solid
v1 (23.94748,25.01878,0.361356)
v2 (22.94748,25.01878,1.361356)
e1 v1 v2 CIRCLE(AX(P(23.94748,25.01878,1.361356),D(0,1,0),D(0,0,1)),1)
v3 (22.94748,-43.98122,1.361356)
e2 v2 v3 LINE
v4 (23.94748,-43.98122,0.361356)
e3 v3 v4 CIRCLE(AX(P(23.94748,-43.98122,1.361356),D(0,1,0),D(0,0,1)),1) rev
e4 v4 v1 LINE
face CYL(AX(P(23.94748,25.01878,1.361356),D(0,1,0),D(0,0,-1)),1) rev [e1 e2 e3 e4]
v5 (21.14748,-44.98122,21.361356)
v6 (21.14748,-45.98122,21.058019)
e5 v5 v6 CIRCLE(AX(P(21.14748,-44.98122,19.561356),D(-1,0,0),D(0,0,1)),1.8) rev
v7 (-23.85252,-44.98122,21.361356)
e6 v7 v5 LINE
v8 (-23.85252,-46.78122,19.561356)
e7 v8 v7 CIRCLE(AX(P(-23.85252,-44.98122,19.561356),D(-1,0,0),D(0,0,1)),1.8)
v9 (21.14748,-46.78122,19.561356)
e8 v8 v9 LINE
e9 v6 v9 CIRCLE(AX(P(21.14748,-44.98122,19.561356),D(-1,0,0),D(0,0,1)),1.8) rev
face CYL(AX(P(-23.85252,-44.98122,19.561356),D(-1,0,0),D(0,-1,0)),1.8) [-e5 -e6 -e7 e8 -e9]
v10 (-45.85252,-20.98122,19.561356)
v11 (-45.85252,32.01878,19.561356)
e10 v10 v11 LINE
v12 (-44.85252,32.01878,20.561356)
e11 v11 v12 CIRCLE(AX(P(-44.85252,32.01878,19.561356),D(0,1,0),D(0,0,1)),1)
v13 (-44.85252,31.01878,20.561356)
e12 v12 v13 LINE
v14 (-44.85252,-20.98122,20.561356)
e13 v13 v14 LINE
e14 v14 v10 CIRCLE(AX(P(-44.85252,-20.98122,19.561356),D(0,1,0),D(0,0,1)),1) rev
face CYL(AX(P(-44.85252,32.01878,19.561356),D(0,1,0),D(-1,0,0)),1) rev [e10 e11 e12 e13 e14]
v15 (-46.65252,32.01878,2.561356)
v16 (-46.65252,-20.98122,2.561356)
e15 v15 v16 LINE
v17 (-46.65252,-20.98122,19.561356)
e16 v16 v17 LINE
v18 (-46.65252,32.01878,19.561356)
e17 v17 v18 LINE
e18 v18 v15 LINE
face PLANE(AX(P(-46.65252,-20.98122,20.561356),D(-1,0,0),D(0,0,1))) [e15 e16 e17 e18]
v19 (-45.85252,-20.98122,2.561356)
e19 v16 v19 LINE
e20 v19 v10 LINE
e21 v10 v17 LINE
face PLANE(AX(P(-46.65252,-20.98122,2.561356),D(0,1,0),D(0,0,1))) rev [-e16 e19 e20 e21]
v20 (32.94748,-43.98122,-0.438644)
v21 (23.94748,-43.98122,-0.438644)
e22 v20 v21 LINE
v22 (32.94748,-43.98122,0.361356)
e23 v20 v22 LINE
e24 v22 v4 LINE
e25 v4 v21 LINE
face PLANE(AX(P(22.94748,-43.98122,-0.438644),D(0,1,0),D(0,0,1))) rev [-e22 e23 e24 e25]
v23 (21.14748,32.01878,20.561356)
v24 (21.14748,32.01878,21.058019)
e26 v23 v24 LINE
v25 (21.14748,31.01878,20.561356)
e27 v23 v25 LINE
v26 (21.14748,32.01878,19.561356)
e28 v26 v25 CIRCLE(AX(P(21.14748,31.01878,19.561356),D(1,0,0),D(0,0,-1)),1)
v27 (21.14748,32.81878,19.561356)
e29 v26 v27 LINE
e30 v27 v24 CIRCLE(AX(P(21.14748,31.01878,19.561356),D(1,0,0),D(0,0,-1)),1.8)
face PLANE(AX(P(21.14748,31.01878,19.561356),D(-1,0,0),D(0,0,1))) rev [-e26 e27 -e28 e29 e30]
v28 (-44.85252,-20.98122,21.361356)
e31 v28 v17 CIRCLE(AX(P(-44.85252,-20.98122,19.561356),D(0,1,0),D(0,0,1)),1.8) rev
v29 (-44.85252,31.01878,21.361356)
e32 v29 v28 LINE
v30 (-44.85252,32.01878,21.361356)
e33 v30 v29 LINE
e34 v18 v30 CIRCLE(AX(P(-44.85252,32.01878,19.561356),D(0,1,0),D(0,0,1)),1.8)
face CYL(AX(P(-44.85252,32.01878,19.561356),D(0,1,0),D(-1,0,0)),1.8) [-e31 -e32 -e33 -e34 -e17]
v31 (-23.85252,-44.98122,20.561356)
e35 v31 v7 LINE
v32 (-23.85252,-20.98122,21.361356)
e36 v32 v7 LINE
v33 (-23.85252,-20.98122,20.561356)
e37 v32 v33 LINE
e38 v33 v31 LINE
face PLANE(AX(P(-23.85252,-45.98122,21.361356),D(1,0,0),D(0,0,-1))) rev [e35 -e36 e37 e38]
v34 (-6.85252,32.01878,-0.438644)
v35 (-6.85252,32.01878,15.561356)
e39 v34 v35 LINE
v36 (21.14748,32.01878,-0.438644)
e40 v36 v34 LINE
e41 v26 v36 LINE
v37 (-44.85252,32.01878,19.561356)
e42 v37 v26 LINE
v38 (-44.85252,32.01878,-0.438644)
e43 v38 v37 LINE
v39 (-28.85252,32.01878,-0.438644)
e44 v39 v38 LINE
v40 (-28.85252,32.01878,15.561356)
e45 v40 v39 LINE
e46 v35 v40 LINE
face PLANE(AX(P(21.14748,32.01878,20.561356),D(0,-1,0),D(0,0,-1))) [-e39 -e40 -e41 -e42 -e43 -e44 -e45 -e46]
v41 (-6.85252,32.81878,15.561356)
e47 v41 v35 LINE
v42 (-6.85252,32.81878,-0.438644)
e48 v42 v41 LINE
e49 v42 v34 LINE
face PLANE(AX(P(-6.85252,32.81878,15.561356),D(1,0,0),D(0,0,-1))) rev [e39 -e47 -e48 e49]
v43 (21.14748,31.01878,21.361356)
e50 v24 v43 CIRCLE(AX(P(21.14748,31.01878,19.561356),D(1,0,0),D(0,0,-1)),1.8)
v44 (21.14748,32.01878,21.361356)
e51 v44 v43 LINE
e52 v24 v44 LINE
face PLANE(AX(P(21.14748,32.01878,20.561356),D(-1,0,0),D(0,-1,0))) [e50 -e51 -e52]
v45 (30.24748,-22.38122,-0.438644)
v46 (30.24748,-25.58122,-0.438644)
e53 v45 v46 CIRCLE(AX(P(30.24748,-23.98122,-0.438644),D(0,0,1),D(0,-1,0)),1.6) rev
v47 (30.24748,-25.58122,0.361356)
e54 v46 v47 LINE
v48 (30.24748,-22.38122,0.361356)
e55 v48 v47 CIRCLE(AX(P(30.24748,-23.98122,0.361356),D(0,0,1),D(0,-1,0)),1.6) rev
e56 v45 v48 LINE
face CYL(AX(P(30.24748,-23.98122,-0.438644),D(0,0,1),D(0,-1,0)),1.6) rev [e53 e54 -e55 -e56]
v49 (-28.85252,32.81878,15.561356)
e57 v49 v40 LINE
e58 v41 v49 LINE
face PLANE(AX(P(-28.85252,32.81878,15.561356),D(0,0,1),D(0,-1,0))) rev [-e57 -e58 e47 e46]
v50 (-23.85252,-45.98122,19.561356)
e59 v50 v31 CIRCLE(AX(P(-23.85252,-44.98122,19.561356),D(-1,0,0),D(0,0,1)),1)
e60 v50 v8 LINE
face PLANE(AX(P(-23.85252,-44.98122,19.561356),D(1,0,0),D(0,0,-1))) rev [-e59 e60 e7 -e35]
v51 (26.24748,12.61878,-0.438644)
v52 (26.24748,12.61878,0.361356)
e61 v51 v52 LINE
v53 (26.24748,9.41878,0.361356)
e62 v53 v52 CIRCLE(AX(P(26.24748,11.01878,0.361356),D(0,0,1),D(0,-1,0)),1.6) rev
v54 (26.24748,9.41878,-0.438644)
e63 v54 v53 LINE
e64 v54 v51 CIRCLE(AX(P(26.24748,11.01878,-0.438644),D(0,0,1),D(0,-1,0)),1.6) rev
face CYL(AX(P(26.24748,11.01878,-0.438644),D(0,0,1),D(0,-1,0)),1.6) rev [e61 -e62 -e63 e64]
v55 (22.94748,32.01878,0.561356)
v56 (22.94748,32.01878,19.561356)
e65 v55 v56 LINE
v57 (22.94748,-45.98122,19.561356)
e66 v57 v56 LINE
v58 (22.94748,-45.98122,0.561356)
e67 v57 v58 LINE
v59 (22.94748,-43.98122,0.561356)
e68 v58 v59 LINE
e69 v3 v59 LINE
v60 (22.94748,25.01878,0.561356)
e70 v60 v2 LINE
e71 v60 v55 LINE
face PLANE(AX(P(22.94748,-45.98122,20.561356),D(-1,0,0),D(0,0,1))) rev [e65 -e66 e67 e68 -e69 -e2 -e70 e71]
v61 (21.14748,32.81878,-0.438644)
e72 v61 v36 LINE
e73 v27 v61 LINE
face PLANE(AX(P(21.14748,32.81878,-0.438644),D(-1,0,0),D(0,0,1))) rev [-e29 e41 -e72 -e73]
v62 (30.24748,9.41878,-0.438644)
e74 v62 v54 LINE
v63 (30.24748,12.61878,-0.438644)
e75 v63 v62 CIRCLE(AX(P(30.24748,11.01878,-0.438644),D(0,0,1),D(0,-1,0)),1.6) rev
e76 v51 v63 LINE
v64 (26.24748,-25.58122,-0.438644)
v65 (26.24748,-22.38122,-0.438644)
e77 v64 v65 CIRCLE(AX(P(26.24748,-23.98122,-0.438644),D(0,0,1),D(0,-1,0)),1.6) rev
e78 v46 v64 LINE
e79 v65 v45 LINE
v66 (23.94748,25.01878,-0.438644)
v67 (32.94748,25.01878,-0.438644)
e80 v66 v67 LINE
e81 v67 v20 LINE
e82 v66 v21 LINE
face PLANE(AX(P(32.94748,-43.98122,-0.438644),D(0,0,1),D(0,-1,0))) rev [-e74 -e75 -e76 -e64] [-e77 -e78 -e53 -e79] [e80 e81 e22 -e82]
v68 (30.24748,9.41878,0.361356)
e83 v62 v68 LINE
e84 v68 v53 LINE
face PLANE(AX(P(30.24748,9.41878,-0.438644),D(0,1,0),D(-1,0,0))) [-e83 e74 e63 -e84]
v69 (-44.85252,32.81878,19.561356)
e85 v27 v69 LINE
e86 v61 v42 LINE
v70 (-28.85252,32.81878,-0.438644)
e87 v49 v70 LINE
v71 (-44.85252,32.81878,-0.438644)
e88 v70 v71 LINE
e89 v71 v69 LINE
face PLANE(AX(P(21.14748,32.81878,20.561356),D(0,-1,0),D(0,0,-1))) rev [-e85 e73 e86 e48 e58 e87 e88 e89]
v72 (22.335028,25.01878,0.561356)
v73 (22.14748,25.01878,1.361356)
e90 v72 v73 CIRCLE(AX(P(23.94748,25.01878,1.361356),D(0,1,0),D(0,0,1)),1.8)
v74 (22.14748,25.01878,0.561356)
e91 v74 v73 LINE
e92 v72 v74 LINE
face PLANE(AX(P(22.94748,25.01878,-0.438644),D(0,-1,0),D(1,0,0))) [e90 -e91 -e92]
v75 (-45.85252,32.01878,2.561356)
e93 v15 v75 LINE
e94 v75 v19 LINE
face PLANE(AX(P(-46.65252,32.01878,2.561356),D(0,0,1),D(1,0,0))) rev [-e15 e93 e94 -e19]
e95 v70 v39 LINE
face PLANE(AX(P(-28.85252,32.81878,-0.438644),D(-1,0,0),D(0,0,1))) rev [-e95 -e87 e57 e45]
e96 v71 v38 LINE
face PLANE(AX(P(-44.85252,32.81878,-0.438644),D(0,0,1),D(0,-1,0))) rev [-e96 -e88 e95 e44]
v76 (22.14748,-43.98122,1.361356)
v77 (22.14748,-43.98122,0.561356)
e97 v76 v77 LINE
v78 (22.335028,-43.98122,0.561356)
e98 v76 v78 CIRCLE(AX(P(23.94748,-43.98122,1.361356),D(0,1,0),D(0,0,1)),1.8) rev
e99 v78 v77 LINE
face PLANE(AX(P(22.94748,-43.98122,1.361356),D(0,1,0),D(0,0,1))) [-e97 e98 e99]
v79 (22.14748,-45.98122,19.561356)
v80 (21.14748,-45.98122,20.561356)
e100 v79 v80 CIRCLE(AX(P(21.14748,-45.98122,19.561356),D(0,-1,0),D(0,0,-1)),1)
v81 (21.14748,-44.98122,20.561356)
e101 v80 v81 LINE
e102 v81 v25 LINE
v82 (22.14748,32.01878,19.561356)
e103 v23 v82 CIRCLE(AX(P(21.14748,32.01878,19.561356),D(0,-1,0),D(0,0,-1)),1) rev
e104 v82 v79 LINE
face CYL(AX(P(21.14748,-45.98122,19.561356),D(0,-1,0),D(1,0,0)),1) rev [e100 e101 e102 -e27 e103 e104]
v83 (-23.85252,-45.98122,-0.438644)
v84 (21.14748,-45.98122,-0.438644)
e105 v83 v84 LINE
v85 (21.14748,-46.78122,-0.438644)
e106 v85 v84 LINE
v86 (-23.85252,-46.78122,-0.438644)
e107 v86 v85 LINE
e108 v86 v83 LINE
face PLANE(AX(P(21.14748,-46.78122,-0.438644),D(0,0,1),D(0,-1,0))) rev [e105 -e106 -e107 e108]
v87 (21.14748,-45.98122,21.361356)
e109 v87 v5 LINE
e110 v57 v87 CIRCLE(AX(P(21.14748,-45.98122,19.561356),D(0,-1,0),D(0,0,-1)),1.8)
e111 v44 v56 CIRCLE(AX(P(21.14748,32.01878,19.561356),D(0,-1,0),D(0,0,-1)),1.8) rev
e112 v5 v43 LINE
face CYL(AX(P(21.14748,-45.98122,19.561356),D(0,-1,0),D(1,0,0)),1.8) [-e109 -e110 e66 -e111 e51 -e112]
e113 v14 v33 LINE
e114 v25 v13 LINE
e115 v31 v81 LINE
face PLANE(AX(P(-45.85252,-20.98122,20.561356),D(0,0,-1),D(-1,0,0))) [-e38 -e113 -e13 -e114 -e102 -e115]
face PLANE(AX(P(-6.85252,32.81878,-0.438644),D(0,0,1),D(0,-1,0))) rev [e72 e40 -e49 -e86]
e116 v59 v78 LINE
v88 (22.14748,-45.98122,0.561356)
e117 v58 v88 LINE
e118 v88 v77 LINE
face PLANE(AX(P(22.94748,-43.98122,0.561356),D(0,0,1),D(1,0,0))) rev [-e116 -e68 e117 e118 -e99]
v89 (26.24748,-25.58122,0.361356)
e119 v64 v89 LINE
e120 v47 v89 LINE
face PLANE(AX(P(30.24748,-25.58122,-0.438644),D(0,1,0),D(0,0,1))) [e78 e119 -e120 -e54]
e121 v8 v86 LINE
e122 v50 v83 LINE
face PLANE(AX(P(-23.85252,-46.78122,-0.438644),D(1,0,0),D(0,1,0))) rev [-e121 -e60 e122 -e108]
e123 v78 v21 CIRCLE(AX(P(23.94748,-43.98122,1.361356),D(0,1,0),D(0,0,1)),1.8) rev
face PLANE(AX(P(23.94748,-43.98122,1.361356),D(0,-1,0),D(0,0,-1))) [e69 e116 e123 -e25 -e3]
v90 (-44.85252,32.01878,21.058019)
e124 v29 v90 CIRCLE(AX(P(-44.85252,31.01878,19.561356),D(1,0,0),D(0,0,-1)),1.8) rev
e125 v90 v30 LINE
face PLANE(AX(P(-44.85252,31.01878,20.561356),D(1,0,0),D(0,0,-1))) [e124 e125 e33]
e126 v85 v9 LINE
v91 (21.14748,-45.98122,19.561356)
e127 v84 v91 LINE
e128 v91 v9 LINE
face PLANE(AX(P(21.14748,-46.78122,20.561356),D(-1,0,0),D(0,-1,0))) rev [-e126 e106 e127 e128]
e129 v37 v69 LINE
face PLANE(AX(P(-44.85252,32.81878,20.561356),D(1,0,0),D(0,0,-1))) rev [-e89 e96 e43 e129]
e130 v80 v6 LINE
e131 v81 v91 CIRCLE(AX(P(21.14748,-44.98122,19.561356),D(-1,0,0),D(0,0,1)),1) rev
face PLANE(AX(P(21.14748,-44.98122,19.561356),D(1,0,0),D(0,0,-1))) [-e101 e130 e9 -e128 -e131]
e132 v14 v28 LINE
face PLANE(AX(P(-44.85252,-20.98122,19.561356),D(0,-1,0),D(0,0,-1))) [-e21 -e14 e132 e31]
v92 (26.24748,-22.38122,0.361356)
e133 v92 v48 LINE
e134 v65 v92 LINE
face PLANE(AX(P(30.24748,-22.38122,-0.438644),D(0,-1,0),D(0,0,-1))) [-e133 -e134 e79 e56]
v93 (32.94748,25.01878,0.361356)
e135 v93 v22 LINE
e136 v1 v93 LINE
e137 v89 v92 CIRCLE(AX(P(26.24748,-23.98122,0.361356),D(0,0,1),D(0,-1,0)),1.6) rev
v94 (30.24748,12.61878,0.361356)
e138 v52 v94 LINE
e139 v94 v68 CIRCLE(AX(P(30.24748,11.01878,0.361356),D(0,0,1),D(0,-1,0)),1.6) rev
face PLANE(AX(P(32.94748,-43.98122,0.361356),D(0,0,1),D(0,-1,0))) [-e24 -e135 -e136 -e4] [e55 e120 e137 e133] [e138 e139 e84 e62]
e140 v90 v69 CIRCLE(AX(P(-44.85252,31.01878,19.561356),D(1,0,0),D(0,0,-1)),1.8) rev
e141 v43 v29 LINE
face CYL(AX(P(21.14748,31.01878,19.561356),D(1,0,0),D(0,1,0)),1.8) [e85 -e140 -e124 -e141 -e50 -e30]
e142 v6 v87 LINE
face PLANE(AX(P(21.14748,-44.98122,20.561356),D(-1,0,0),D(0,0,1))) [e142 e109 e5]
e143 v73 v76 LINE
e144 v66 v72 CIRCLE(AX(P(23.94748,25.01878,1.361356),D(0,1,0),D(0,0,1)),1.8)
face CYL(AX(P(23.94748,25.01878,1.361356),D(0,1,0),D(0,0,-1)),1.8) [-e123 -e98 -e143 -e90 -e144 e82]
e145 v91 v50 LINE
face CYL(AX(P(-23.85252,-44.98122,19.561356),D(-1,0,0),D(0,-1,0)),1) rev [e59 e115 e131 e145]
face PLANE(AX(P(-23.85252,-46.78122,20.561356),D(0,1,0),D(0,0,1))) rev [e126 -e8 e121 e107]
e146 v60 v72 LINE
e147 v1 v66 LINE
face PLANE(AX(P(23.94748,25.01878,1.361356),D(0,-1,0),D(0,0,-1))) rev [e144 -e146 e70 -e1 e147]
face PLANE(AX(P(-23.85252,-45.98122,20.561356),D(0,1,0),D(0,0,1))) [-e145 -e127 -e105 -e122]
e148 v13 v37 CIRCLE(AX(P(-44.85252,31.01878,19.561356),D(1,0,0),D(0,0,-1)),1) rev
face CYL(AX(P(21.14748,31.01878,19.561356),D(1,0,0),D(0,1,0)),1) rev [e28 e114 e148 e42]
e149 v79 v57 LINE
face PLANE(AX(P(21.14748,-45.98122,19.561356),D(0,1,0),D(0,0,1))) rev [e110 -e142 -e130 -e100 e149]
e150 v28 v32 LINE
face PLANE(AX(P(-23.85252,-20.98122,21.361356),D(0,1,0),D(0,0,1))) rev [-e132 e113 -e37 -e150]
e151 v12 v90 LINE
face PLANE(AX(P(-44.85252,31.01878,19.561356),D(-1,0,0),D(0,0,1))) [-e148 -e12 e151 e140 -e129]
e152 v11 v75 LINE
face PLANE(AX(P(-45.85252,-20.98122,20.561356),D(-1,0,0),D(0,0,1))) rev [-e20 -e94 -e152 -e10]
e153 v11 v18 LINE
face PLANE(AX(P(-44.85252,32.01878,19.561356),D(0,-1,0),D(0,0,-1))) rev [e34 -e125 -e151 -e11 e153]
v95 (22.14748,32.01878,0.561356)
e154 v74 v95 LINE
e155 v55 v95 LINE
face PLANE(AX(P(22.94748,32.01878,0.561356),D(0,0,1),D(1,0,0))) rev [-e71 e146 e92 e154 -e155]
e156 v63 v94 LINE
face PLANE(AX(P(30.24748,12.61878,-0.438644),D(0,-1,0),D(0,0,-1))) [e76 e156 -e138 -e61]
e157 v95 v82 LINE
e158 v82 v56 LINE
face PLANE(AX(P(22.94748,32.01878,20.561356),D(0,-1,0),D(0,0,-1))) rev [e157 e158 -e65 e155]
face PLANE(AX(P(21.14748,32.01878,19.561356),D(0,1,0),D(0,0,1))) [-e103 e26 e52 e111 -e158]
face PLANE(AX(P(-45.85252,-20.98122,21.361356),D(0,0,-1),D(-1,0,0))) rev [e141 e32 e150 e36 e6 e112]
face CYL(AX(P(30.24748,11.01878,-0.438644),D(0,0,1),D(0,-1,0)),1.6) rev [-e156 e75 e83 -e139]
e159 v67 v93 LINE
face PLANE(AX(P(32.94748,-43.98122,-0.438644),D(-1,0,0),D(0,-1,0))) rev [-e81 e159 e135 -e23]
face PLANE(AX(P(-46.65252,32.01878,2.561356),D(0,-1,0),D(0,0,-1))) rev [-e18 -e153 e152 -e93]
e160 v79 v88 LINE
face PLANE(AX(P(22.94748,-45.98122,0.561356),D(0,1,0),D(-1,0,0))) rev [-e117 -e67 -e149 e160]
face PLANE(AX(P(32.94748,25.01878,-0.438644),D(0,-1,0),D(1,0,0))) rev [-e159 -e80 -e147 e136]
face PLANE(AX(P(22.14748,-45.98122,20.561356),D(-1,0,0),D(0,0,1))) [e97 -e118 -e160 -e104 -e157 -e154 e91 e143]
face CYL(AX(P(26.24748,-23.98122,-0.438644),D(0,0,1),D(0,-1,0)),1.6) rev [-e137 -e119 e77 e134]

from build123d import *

# Parameters (mm, degrees)
BASE_FLANGE1_DEPTH           = 0.8
EDGE_FLANGE1_STRIP_W         = 5.2
EDGE_FLANGE1_STRIP_H         = 0.8
EDGE_FLANGE1_STRIP_CUT_DEPTH = 53
EDGE_FLANGE1_DEPTH           = 53
EDGE_FLANGE4_STRIP_W         = 5.2
EDGE_FLANGE4_STRIP_H         = 0.8
EDGE_FLANGE4_STRIP_CUT_DEPTH = 78
EDGE_FLANGE4_DEPTH           = 78
EDGE_FLANGE4_START           = 0.8
EDGE_FLANGE4_FLAT_DEPTH      = 0.8
EDGE_FLANGE6_STRIP_W         = 5.2
EDGE_FLANGE6_STRIP_H         = 0.8
EDGE_FLANGE6_STRIP_CUT_DEPTH = 69
EDGE_FLANGE6_DEPTH           = 69
EDGE_FLANGE6_PROFILE_W       = 69
EDGE_FLANGE6_PROFILE_H       = 9
EDGE_FLANGE6_FLAT_DEPTH      = 0.8
EDGE_FLANGE7_STRIP_W         = 5.2
EDGE_FLANGE7_STRIP_H         = 0.8
EDGE_FLANGE7_STRIP_CUT_DEPTH = 45
EDGE_FLANGE7_DEPTH           = 45
EDGE_FLANGE8_STRIP_W         = 5.2
EDGE_FLANGE8_STRIP_H         = 0.8
EDGE_FLANGE8_STRIP_CUT_DEPTH = 66
EDGE_FLANGE8_DEPTH           = 66
EDGE_FLANGE8_START           = 0.8
EDGE_FLANGE8_FLAT_DEPTH      = 0.8


# Sheet-metal steps are written as plain solids
with BuildPart() as part:
    # Sketch1 → Base-Flange1 (new body)
    with BuildSketch(Plane.XY.offset(20.561355821)):
        Polygon((22.147479573, -45.981220417), (-23.852520427, -45.981220417), (-23.852520427, -20.981220417), (-45.852520427, -20.981220417), (-45.852520427, 32.018779583), (22.147479573, 32.018779583), align=None)
    extrude(amount=BASE_FLANGE1_DEPTH)

    # Edge-Flange1 strip (across the edge) → Edge-Flange1 strip cut (cut)
    with BuildSketch(Plane(origin=(-45.852520427, -20.981220417, 20.561355821), x_dir=(1, 0, 0), z_dir=(0, 1, 0))):
        with Locations((-1.6, -0.4)):
            Rectangle(EDGE_FLANGE1_STRIP_W, EDGE_FLANGE1_STRIP_H)
    extrude(amount=EDGE_FLANGE1_STRIP_CUT_DEPTH, mode=Mode.SUBTRACT)

    # Edge-Flange1 section (across the edge) → Edge-Flange1 (add)
    with BuildSketch(Plane(origin=(-45.852520427, -20.981220417, 20.561355821), x_dir=(1, 0, 0), z_dir=(0, 1, 0))):
        with BuildLine():
            Line((-0.8, 1), (-0.8, 18))
            Line((-0.8, 18), (0, 18))
            Line((0, 18), (0, 1))
            ThreePointArc((0, 1), (0.292893219, 0.292893219), (1, 0))
            Line((1, 0), (1, -0.8))
            ThreePointArc((1, -0.8), (-0.272792206, -0.272792206), (-0.8, 1))
        make_face()
    extrude(amount=EDGE_FLANGE1_DEPTH)

    # Edge-Flange4 strip (across the edge) → Edge-Flange4 strip cut (cut)
    with BuildSketch(Plane(origin=(22.147479573, 32.018779583, 20.561355821), x_dir=(-1, 0, 0), z_dir=(0, -1, 0))):
        with Locations((-1.6, -0.4)):
            Rectangle(EDGE_FLANGE4_STRIP_W, EDGE_FLANGE4_STRIP_H)
    extrude(amount=EDGE_FLANGE4_STRIP_CUT_DEPTH, mode=Mode.SUBTRACT)

    # Edge-Flange4 bend section (across the edge) → Edge-Flange4 (add)
    with BuildSketch(Plane(origin=(22.147479573, 32.018779583, 20.561355821), x_dir=(-1, 0, 0), z_dir=(0, -1, 0))):
        with BuildLine():
            Line((-0.8, 1), (0, 1))
            ThreePointArc((0, 1), (0.292893219, 0.292893219), (1, 0))
            Line((1, 0), (1, -0.8))
            ThreePointArc((1, -0.8), (-0.272792206, -0.272792206), (-0.8, 1))
        make_face()
    extrude(amount=EDGE_FLANGE4_DEPTH)

    # Edge-Flange4 profile (on flange) → Edge-Flange4 flat (add)
    with BuildSketch(Plane(origin=(22.147479573, 0, 20.561355821), x_dir=(0, -1, 0), z_dir=(1, 0, 0)).offset(EDGE_FLANGE4_START)):
        Polygon((45.981220417, 1), (45.981220417, 20), (43.981220417, 20), (43.981220417, 21), (-25.018779583, 21), (-25.018779583, 20), (-32.018779583, 20), (-32.018779583, 1), align=None)
    extrude(amount=-EDGE_FLANGE4_FLAT_DEPTH)

    # Edge-Flange6 strip (across the edge) → Edge-Flange6 strip cut (cut)
    with BuildSketch(Plane(origin=(22.947479573, -43.981220417, -0.438644179), x_dir=(0, 0, 1), z_dir=(0, 1, 0))):
        with Locations((-0.8, -0.4)):
            Rectangle(EDGE_FLANGE6_STRIP_W, EDGE_FLANGE6_STRIP_H)
    extrude(amount=EDGE_FLANGE6_STRIP_CUT_DEPTH, mode=Mode.SUBTRACT)

    # Edge-Flange6 bend section (across the edge) → Edge-Flange6 (add)
    with BuildSketch(Plane(origin=(22.947479573, -43.981220417, -0.438644179), x_dir=(0, 0, 1), z_dir=(0, 1, 0))):
        with BuildLine():
            Line((0, 1), (0.8, 1))
            ThreePointArc((0.8, 1), (1.092893219, 0.292893219), (1.8, 0))
            Line((1.8, 0), (1.8, -0.8))
            ThreePointArc((1.8, -0.8), (0.527207794, -0.272792206), (0, 1))
        make_face()
    extrude(amount=EDGE_FLANGE6_DEPTH)

    # Edge-Flange6 profile (on flange) → Edge-Flange6 flat (add)
    with BuildSketch(Plane(origin=(22.947479573, 0, -0.438644179), x_dir=(0, 1, 0), z_dir=(0, 0, -1))):
        with Locations((-9.481220417, 5.5)):
            Rectangle(EDGE_FLANGE6_PROFILE_W, EDGE_FLANGE6_PROFILE_H)
        with BuildLine():
            Line((-25.581220417, 3.3), (-25.581220417, 7.3))
            ThreePointArc((-25.581220417, 7.3), (-23.981220417, 8.9), (-22.381220417, 7.3))
            Line((-22.381220417, 7.3), (-22.381220417, 3.3))
            ThreePointArc((-22.381220417, 3.3), (-23.981220417, 1.7), (-25.581220417, 3.3))
        make_face(mode=Mode.SUBTRACT)
        with BuildLine():
            ThreePointArc((9.418779583, 7.3), (11.018779583, 8.9), (12.618779583, 7.3))
            Line((12.618779583, 7.3), (12.618779583, 3.3))
            ThreePointArc((12.618779583, 3.3), (11.018779583, 1.7), (9.418779583, 3.3))
            Line((9.418779583, 3.3), (9.418779583, 7.3))
        make_face(mode=Mode.SUBTRACT)
    extrude(amount=-EDGE_FLANGE6_FLAT_DEPTH)

    # Edge-Flange7 strip (across the edge) → Edge-Flange7 strip cut (cut)
    with BuildSketch(Plane(origin=(21.147479573, -45.981220417, 20.561355821), x_dir=(0, 1, 0), z_dir=(-1, 0, 0))):
        with Locations((-1.6, -0.4)):
            Rectangle(EDGE_FLANGE7_STRIP_W, EDGE_FLANGE7_STRIP_H)
    extrude(amount=EDGE_FLANGE7_STRIP_CUT_DEPTH, mode=Mode.SUBTRACT)

    # Edge-Flange7 section (across the edge) → Edge-Flange7 (add)
    with BuildSketch(Plane(origin=(21.147479573, -45.981220417, 20.561355821), x_dir=(0, 1, 0), z_dir=(-1, 0, 0))):
        with BuildLine():
            Line((-0.8, 1), (-0.8, 21))
            Line((-0.8, 21), (0, 21))
            Line((0, 21), (0, 1))
            ThreePointArc((0, 1), (0.292893219, 0.292893219), (1, 0))
            Line((1, 0), (1, -0.8))
            ThreePointArc((1, -0.8), (-0.272792206, -0.272792206), (-0.8, 1))
        make_face()
    extrude(amount=EDGE_FLANGE7_DEPTH)

    # Edge-Flange8 strip (across the edge) → Edge-Flange8 strip cut (cut)
    with BuildSketch(Plane(origin=(-44.852520427, 32.018779583, 20.561355821), x_dir=(0, -1, 0), z_dir=(1, 0, 0))):
        with Locations((-1.6, -0.4)):
            Rectangle(EDGE_FLANGE8_STRIP_W, EDGE_FLANGE8_STRIP_H)
    extrude(amount=EDGE_FLANGE8_STRIP_CUT_DEPTH, mode=Mode.SUBTRACT)

    # Edge-Flange8 bend section (across the edge) → Edge-Flange8 (add)
    with BuildSketch(Plane(origin=(-44.852520427, 32.018779583, 20.561355821), x_dir=(0, -1, 0), z_dir=(1, 0, 0))):
        with BuildLine():
            Line((-0.8, 1), (0, 1))
            ThreePointArc((0, 1), (0.292893219, 0.292893219), (1, 0))
            Line((1, 0), (1, -0.8))
            ThreePointArc((1, -0.8), (-0.272792206, -0.272792206), (-0.8, 1))
        make_face()
    extrude(amount=EDGE_FLANGE8_DEPTH)

    # Edge-Flange8 profile (on flange) → Edge-Flange8 flat (add)
    with BuildSketch(Plane(origin=(0, 32.018779583, 20.561355821), x_dir=(1, 0, 0), z_dir=(0, 1, 0)).offset(EDGE_FLANGE8_START)):
        Polygon((21.147479573, 1), (21.147479573, 21), (-6.852520427, 21), (-6.852520427, 5), (-28.852520427, 5), (-28.852520427, 21), (-44.852520427, 21), (-44.852520427, 1), align=None)
    extrude(amount=-EDGE_FLANGE8_FLAT_DEPTH)


solid = part.part
